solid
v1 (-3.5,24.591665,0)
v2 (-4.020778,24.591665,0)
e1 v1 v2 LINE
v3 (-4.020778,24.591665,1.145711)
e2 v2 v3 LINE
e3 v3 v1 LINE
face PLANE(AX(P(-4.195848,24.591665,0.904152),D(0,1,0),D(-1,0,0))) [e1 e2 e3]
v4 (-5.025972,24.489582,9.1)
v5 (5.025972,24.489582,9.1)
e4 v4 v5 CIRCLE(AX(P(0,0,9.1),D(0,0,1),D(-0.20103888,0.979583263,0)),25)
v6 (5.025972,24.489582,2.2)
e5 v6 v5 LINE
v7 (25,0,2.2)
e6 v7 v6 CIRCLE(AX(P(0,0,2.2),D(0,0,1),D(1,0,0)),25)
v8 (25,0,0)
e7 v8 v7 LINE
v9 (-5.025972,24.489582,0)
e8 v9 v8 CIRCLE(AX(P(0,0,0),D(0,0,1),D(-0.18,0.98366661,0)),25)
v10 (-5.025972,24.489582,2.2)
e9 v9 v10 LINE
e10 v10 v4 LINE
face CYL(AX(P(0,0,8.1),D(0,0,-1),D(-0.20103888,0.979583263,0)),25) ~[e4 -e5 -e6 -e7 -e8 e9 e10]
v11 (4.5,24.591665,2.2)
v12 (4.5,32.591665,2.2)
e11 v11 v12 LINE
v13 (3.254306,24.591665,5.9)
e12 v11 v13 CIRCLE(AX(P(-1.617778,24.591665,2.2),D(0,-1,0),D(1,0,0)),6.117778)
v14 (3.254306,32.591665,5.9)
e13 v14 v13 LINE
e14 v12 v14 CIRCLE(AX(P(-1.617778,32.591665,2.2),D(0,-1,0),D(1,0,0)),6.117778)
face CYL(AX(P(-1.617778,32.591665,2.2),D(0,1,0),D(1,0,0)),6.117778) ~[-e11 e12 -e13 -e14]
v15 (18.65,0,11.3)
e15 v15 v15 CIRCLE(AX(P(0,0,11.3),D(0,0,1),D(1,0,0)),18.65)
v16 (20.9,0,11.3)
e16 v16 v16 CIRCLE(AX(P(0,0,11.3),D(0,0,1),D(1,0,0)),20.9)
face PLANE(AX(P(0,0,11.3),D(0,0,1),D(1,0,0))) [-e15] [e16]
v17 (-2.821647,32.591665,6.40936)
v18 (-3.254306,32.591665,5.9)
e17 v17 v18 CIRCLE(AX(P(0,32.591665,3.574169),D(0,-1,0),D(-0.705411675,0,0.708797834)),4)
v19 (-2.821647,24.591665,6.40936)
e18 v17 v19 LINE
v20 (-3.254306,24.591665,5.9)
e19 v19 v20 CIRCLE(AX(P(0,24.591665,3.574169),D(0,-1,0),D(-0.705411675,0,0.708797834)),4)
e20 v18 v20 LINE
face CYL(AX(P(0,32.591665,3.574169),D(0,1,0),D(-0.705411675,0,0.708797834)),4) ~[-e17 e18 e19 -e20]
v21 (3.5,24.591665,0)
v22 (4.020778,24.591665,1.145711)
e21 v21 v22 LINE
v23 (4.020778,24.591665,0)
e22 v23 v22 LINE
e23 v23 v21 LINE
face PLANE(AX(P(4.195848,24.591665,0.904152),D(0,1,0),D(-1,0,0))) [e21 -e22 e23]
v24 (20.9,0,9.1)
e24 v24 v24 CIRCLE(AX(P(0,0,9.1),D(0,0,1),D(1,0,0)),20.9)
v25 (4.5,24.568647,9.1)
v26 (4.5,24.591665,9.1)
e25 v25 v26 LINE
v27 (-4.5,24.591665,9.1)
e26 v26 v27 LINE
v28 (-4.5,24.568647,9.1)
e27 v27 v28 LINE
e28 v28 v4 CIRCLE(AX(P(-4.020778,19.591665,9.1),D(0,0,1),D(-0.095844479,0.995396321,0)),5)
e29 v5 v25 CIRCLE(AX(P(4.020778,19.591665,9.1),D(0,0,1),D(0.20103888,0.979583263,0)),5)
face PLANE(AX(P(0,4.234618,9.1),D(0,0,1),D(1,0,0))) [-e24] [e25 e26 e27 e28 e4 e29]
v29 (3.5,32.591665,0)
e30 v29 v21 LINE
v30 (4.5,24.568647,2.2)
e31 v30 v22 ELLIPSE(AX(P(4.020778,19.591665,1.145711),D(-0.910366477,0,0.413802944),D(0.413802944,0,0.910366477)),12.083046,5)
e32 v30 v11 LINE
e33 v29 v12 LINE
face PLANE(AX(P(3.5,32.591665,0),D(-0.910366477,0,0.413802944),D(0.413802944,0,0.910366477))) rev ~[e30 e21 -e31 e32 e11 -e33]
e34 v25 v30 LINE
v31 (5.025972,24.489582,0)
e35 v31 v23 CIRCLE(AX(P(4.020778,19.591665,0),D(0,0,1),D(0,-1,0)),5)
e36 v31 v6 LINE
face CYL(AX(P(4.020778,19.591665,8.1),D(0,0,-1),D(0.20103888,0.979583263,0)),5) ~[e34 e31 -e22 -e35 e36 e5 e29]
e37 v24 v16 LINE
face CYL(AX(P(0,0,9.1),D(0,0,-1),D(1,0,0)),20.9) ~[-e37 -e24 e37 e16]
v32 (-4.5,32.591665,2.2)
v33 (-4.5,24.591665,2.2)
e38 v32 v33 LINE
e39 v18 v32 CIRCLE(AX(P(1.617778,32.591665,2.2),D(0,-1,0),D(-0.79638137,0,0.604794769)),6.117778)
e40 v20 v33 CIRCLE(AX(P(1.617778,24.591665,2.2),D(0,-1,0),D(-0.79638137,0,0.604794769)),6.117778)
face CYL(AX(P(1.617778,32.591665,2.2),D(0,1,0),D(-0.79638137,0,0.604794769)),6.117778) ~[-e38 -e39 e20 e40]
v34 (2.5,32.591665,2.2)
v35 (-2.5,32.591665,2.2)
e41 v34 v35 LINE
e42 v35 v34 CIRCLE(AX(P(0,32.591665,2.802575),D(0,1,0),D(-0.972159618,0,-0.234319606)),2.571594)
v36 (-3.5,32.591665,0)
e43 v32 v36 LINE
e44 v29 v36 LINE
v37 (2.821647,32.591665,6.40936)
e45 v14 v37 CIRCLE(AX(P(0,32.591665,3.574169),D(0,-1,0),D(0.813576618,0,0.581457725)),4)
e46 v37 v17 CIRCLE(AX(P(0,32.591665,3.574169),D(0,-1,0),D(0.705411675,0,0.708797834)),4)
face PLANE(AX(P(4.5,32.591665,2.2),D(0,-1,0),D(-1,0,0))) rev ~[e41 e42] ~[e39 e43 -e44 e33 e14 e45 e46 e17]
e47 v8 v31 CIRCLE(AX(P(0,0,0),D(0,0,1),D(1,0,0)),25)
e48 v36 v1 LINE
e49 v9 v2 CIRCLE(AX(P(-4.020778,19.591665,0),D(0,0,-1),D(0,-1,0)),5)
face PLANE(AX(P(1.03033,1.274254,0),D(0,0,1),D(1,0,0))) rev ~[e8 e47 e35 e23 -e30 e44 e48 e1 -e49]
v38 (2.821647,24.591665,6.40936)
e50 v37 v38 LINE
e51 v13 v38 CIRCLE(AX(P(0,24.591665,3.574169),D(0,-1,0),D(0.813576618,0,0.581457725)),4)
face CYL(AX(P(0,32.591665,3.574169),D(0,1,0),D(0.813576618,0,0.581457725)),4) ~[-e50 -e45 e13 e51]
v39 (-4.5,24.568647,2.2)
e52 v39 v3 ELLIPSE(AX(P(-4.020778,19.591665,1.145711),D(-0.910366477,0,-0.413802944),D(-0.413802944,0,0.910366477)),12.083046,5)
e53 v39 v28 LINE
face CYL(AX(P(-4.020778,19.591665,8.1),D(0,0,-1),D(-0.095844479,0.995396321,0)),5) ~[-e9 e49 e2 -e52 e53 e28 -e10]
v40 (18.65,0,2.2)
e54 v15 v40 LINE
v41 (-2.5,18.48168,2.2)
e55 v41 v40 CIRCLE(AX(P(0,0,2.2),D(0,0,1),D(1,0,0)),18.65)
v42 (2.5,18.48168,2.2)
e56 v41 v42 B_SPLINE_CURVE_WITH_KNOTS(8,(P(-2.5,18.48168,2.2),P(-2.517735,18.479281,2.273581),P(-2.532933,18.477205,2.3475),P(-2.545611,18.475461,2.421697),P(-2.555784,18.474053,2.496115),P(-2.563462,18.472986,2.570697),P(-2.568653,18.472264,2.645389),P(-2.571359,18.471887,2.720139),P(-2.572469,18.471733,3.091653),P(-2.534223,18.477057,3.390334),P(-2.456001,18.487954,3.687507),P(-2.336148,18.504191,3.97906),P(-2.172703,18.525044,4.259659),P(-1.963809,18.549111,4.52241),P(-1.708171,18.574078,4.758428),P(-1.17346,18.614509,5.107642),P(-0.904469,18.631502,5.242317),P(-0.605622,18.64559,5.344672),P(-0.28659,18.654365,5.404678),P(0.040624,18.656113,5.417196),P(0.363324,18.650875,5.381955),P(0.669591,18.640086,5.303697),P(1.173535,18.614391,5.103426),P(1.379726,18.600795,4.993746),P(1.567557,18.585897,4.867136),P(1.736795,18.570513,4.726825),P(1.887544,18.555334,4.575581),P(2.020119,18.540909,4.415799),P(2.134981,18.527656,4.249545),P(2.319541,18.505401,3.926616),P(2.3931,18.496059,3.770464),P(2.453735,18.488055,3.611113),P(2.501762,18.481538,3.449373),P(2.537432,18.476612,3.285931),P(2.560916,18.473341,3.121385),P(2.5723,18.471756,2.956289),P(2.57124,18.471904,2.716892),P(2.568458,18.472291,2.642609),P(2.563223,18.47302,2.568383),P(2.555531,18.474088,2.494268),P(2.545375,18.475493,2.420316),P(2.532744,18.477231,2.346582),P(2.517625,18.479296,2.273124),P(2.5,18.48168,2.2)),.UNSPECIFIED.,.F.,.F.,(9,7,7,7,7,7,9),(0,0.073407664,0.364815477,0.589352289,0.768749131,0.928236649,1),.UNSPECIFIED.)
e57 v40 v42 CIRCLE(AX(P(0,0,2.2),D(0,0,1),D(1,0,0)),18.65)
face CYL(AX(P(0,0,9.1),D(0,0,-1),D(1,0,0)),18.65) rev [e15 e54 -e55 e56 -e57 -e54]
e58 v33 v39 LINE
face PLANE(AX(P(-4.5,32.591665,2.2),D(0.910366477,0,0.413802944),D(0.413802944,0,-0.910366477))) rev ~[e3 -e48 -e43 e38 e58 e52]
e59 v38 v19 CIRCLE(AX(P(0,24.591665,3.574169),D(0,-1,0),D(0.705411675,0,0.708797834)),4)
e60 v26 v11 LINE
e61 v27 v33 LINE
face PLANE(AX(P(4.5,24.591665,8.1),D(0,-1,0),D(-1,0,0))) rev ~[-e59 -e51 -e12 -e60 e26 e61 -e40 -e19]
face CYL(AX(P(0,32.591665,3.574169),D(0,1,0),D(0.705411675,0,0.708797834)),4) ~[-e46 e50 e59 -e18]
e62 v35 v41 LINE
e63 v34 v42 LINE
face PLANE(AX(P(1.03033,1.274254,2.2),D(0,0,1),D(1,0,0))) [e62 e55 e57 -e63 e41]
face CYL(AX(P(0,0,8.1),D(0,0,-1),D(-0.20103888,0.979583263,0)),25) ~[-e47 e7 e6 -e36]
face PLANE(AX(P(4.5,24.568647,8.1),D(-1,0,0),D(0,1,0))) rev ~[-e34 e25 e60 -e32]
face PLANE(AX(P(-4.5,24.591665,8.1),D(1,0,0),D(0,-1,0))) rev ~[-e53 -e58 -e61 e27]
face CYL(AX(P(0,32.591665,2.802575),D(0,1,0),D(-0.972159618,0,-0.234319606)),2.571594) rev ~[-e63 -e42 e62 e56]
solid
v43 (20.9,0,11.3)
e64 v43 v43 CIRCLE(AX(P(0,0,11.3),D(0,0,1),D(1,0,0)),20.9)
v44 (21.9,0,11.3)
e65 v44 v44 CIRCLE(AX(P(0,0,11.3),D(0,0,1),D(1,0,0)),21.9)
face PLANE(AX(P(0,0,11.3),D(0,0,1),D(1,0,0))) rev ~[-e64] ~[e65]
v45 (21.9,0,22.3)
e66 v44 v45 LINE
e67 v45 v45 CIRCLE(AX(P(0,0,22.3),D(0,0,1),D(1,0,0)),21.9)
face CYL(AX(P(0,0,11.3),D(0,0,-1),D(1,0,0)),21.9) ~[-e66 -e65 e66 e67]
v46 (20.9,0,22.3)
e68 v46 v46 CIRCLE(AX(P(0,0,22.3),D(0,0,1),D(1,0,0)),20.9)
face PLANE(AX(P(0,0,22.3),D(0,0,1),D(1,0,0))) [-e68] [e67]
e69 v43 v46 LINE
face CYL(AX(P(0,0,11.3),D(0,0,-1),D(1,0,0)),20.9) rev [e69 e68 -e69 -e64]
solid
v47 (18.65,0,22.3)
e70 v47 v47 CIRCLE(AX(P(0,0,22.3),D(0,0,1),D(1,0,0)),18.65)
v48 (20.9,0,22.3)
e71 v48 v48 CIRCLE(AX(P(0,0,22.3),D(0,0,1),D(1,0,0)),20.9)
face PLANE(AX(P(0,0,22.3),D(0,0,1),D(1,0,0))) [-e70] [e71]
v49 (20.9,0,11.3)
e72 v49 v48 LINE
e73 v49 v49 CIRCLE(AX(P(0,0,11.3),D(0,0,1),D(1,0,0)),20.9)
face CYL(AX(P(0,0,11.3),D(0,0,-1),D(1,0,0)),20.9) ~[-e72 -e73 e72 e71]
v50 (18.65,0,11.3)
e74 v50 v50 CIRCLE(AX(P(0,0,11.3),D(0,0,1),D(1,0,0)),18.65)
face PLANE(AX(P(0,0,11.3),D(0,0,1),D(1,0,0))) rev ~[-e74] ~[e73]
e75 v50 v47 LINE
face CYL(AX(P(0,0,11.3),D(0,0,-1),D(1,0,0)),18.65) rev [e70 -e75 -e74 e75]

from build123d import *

# Parameters (mm, degrees)
F1_DEPTH  = 2.2
F3_DEPTH  = 8
F4_R      = 5
F5_R      = 18.65
F6_DEPTH  = 5.9
F8_DEPTH  = 8
F9_DEPTH  = 8
F11_DEPTH = 15
F12_DEPTH = 1
F13_R     = 20.9
F13_R_2   = 18.65
F14_DEPTH = 2.2
F15_R     = 21.9
F15_R_2   = 20.9
F16_DEPTH = 11
F17_DEPTH = 11


# Not quite as in the source:
# - a feature names something its author has since deleted; it is built from what else it names


with BuildPart() as f1:
    # F0 (on Top) → F1 (new body)
    with BuildSketch(Plane.XY):
        with BuildLine():
            ThreePointArc((-4.5, 24.5916652547), (-16.0078105936, -19.2028643697), (25, 0))
            ThreePointArc((25, 0), (19.2028643697, 16.0078105936), (4.5, 24.5916652547))
            ThreePointArc((4.5, 24.5916652547), (0, 25), (-4.5, 24.5916652547))
        make_face()
        with BuildLine():
            ThreePointArc((-4.5, 24.5916652547), (0, 25), (4.5, 24.5916652547))
            Line((4.5, 24.5916652547), (4.5, 32.5916652547))
            Line((4.5, 32.5916652547), (-4.5, 32.5916652547))
            Line((-4.5, 32.5916652547), (-4.5, 24.5916652547))
        make_face()
    extrude(amount=F1_DEPTH)

    # F2 (on face) → F3 (cut)
    with BuildSketch(Plane(origin=(0, 32.5916652547, 0), x_dir=(-1, 0, 0), z_dir=(0, 1, 0))):
        Polygon((-3.5, 0), (-4.5, 2.2), (-4.5, 0), align=None)
        Polygon((4.5, 0), (4.5, 2.2), (3.5, 0), align=None)
    extrude(amount=-F3_DEPTH, mode=Mode.SUBTRACT)

    # F4
    f4_edges = [f1.edges().sort_by_distance(p)[0] for p in [
        (-4.5, 24.591665, 1.1),
        (4.5, 24.591665, 1.1),
    ]]
    fillet(f4_edges, radius=F4_R)

    # F5 (on face) → F6 (join)
    with BuildSketch(Plane.XY.offset(2.2)):
        with BuildLine():
            ThreePointArc((-4.5, 24.5686468597), (-4.7640380816, 24.5361130362), (-5.025972006, 24.4895815684))
            ThreePointArc((-5.025972006, 24.4895815684), (0, -25), (5.025972006, 24.4895815684))
            ThreePointArc((5.025972006, 24.4895815684), (4.7640380816, 24.5361130362), (4.5, 24.5686468597))
            Line((4.5, 24.5686468597), (4.5, 32.5916652547))
            Line((4.5, 32.5916652547), (-4.5, 32.5916652547))
            Line((-4.5, 32.5916652547), (-4.5, 24.5686468597))
        make_face()
        Circle(F5_R, mode=Mode.SUBTRACT)
    extrude(amount=F6_DEPTH)

    # F7 (on face) → F8 (cut)
    with BuildSketch(Plane(origin=(0, 32.5916652547, 0), x_dir=(-1, 0, 0), z_dir=(0, 1, 0))):
        with BuildLine():
            Line((-4.5, 8.1), (-4.5, 2.2))
            ThreePointArc((-4.5, 2.2), (-4.1802190183, 4.1520343469), (-3.2543064721, 5.9))
            ThreePointArc((-3.2543064721, 5.9), (-3.0486330946, 6.1637320445), (-2.8216466984, 6.4093604335))
            ThreePointArc((-2.8216466984, 6.4093604335), (-1.5265807136, 7.4478771533), (0, 8.1))
            Line((0, 8.1), (-4.5, 8.1))
        make_face()
        with BuildLine():
            ThreePointArc((3.2543064721, 5.9), (4.1802190183, 4.1520343469), (4.5, 2.2))
            Line((4.5, 2.2), (4.5, 8.1))
            Line((4.5, 8.1), (0, 8.1))
            ThreePointArc((0, 8.1), (1.5265807136, 7.4478771533), (2.8216466984, 6.4093604335))
            ThreePointArc((2.8216466984, 6.4093604335), (3.0486330946, 6.1637320445), (3.2543064721, 5.9))
        make_face()
        with BuildLine():
            ThreePointArc((0, 8.1), (-1.5265807136, 7.4478771533), (-2.8216466984, 6.4093604335))
            ThreePointArc((-2.8216466984, 6.4093604335), (0, 7.5741690978), (2.8216466984, 6.4093604335))
            ThreePointArc((2.8216466984, 6.4093604335), (1.5265807136, 7.4478771533), (0, 8.1))
        make_face()
    extrude(amount=-F8_DEPTH, mode=Mode.SUBTRACT)

    # F7 (on face) → F9 (cut)
    with BuildSketch(Plane(origin=(0, 32.5916652547, 0), x_dir=(-1, 0, 0), z_dir=(0, 1, 0))):
        with BuildLine():
            Line((-4.5, 8.1), (-4.5, 2.2))
            ThreePointArc((-4.5, 2.2), (-4.1802190183, 4.1520343469), (-3.2543064721, 5.9))
            ThreePointArc((-3.2543064721, 5.9), (-3.0486330946, 6.1637320445), (-2.8216466984, 6.4093604335))
            ThreePointArc((-2.8216466984, 6.4093604335), (-1.5265807136, 7.4478771533), (0, 8.1))
            Line((0, 8.1), (-4.5, 8.1))
        make_face()
    extrude(amount=-F9_DEPTH, mode=Mode.SUBTRACT)

    # F10 (on face) → F11 (cut)
    with BuildSketch(Plane(origin=(0, 32.5916652547, 0), x_dir=(-1, 0, 0), z_dir=(0, 1, 0))):
        with BuildLine():
            ThreePointArc((2.5, 2.2), (0, 5.3741690978), (-2.5, 2.2))
            Line((-2.5, 2.2), (2.5, 2.2))
        make_face()
    extrude(amount=-F11_DEPTH, mode=Mode.SUBTRACT)

    # F12 (add): a face of the model
    f12_faces = [f1.faces().sort_by_distance(p)[0] for p in [
        (-3.7957746623, 24.5801560572, 8.1),
    ]]
    extrude(f12_faces, amount=F12_DEPTH)

    # F13 (on face) → F14 (join)
    with BuildSketch(Plane.XY.offset(9.1)):
        Circle(F13_R)
        Circle(F13_R_2, mode=Mode.SUBTRACT)
    extrude(amount=F14_DEPTH)


with BuildPart() as f16:
    # F15 (on face) → F16 (new body)
    with BuildSketch(Plane.XY.offset(11.3)):
        Circle(F15_R)
        Circle(F15_R_2, mode=Mode.SUBTRACT)
    extrude(amount=F16_DEPTH)


with BuildPart() as f17:
    # F17 (new): a face of the model
    f17_faces = [f1.part.faces().sort_by_distance(p)[0] for p in [
        (-20.3088587309, 0, 11.3),
    ]]
    extrude(f17_faces, amount=F17_DEPTH)


solid = Compound([f1.part, f16.part, f17.part])
